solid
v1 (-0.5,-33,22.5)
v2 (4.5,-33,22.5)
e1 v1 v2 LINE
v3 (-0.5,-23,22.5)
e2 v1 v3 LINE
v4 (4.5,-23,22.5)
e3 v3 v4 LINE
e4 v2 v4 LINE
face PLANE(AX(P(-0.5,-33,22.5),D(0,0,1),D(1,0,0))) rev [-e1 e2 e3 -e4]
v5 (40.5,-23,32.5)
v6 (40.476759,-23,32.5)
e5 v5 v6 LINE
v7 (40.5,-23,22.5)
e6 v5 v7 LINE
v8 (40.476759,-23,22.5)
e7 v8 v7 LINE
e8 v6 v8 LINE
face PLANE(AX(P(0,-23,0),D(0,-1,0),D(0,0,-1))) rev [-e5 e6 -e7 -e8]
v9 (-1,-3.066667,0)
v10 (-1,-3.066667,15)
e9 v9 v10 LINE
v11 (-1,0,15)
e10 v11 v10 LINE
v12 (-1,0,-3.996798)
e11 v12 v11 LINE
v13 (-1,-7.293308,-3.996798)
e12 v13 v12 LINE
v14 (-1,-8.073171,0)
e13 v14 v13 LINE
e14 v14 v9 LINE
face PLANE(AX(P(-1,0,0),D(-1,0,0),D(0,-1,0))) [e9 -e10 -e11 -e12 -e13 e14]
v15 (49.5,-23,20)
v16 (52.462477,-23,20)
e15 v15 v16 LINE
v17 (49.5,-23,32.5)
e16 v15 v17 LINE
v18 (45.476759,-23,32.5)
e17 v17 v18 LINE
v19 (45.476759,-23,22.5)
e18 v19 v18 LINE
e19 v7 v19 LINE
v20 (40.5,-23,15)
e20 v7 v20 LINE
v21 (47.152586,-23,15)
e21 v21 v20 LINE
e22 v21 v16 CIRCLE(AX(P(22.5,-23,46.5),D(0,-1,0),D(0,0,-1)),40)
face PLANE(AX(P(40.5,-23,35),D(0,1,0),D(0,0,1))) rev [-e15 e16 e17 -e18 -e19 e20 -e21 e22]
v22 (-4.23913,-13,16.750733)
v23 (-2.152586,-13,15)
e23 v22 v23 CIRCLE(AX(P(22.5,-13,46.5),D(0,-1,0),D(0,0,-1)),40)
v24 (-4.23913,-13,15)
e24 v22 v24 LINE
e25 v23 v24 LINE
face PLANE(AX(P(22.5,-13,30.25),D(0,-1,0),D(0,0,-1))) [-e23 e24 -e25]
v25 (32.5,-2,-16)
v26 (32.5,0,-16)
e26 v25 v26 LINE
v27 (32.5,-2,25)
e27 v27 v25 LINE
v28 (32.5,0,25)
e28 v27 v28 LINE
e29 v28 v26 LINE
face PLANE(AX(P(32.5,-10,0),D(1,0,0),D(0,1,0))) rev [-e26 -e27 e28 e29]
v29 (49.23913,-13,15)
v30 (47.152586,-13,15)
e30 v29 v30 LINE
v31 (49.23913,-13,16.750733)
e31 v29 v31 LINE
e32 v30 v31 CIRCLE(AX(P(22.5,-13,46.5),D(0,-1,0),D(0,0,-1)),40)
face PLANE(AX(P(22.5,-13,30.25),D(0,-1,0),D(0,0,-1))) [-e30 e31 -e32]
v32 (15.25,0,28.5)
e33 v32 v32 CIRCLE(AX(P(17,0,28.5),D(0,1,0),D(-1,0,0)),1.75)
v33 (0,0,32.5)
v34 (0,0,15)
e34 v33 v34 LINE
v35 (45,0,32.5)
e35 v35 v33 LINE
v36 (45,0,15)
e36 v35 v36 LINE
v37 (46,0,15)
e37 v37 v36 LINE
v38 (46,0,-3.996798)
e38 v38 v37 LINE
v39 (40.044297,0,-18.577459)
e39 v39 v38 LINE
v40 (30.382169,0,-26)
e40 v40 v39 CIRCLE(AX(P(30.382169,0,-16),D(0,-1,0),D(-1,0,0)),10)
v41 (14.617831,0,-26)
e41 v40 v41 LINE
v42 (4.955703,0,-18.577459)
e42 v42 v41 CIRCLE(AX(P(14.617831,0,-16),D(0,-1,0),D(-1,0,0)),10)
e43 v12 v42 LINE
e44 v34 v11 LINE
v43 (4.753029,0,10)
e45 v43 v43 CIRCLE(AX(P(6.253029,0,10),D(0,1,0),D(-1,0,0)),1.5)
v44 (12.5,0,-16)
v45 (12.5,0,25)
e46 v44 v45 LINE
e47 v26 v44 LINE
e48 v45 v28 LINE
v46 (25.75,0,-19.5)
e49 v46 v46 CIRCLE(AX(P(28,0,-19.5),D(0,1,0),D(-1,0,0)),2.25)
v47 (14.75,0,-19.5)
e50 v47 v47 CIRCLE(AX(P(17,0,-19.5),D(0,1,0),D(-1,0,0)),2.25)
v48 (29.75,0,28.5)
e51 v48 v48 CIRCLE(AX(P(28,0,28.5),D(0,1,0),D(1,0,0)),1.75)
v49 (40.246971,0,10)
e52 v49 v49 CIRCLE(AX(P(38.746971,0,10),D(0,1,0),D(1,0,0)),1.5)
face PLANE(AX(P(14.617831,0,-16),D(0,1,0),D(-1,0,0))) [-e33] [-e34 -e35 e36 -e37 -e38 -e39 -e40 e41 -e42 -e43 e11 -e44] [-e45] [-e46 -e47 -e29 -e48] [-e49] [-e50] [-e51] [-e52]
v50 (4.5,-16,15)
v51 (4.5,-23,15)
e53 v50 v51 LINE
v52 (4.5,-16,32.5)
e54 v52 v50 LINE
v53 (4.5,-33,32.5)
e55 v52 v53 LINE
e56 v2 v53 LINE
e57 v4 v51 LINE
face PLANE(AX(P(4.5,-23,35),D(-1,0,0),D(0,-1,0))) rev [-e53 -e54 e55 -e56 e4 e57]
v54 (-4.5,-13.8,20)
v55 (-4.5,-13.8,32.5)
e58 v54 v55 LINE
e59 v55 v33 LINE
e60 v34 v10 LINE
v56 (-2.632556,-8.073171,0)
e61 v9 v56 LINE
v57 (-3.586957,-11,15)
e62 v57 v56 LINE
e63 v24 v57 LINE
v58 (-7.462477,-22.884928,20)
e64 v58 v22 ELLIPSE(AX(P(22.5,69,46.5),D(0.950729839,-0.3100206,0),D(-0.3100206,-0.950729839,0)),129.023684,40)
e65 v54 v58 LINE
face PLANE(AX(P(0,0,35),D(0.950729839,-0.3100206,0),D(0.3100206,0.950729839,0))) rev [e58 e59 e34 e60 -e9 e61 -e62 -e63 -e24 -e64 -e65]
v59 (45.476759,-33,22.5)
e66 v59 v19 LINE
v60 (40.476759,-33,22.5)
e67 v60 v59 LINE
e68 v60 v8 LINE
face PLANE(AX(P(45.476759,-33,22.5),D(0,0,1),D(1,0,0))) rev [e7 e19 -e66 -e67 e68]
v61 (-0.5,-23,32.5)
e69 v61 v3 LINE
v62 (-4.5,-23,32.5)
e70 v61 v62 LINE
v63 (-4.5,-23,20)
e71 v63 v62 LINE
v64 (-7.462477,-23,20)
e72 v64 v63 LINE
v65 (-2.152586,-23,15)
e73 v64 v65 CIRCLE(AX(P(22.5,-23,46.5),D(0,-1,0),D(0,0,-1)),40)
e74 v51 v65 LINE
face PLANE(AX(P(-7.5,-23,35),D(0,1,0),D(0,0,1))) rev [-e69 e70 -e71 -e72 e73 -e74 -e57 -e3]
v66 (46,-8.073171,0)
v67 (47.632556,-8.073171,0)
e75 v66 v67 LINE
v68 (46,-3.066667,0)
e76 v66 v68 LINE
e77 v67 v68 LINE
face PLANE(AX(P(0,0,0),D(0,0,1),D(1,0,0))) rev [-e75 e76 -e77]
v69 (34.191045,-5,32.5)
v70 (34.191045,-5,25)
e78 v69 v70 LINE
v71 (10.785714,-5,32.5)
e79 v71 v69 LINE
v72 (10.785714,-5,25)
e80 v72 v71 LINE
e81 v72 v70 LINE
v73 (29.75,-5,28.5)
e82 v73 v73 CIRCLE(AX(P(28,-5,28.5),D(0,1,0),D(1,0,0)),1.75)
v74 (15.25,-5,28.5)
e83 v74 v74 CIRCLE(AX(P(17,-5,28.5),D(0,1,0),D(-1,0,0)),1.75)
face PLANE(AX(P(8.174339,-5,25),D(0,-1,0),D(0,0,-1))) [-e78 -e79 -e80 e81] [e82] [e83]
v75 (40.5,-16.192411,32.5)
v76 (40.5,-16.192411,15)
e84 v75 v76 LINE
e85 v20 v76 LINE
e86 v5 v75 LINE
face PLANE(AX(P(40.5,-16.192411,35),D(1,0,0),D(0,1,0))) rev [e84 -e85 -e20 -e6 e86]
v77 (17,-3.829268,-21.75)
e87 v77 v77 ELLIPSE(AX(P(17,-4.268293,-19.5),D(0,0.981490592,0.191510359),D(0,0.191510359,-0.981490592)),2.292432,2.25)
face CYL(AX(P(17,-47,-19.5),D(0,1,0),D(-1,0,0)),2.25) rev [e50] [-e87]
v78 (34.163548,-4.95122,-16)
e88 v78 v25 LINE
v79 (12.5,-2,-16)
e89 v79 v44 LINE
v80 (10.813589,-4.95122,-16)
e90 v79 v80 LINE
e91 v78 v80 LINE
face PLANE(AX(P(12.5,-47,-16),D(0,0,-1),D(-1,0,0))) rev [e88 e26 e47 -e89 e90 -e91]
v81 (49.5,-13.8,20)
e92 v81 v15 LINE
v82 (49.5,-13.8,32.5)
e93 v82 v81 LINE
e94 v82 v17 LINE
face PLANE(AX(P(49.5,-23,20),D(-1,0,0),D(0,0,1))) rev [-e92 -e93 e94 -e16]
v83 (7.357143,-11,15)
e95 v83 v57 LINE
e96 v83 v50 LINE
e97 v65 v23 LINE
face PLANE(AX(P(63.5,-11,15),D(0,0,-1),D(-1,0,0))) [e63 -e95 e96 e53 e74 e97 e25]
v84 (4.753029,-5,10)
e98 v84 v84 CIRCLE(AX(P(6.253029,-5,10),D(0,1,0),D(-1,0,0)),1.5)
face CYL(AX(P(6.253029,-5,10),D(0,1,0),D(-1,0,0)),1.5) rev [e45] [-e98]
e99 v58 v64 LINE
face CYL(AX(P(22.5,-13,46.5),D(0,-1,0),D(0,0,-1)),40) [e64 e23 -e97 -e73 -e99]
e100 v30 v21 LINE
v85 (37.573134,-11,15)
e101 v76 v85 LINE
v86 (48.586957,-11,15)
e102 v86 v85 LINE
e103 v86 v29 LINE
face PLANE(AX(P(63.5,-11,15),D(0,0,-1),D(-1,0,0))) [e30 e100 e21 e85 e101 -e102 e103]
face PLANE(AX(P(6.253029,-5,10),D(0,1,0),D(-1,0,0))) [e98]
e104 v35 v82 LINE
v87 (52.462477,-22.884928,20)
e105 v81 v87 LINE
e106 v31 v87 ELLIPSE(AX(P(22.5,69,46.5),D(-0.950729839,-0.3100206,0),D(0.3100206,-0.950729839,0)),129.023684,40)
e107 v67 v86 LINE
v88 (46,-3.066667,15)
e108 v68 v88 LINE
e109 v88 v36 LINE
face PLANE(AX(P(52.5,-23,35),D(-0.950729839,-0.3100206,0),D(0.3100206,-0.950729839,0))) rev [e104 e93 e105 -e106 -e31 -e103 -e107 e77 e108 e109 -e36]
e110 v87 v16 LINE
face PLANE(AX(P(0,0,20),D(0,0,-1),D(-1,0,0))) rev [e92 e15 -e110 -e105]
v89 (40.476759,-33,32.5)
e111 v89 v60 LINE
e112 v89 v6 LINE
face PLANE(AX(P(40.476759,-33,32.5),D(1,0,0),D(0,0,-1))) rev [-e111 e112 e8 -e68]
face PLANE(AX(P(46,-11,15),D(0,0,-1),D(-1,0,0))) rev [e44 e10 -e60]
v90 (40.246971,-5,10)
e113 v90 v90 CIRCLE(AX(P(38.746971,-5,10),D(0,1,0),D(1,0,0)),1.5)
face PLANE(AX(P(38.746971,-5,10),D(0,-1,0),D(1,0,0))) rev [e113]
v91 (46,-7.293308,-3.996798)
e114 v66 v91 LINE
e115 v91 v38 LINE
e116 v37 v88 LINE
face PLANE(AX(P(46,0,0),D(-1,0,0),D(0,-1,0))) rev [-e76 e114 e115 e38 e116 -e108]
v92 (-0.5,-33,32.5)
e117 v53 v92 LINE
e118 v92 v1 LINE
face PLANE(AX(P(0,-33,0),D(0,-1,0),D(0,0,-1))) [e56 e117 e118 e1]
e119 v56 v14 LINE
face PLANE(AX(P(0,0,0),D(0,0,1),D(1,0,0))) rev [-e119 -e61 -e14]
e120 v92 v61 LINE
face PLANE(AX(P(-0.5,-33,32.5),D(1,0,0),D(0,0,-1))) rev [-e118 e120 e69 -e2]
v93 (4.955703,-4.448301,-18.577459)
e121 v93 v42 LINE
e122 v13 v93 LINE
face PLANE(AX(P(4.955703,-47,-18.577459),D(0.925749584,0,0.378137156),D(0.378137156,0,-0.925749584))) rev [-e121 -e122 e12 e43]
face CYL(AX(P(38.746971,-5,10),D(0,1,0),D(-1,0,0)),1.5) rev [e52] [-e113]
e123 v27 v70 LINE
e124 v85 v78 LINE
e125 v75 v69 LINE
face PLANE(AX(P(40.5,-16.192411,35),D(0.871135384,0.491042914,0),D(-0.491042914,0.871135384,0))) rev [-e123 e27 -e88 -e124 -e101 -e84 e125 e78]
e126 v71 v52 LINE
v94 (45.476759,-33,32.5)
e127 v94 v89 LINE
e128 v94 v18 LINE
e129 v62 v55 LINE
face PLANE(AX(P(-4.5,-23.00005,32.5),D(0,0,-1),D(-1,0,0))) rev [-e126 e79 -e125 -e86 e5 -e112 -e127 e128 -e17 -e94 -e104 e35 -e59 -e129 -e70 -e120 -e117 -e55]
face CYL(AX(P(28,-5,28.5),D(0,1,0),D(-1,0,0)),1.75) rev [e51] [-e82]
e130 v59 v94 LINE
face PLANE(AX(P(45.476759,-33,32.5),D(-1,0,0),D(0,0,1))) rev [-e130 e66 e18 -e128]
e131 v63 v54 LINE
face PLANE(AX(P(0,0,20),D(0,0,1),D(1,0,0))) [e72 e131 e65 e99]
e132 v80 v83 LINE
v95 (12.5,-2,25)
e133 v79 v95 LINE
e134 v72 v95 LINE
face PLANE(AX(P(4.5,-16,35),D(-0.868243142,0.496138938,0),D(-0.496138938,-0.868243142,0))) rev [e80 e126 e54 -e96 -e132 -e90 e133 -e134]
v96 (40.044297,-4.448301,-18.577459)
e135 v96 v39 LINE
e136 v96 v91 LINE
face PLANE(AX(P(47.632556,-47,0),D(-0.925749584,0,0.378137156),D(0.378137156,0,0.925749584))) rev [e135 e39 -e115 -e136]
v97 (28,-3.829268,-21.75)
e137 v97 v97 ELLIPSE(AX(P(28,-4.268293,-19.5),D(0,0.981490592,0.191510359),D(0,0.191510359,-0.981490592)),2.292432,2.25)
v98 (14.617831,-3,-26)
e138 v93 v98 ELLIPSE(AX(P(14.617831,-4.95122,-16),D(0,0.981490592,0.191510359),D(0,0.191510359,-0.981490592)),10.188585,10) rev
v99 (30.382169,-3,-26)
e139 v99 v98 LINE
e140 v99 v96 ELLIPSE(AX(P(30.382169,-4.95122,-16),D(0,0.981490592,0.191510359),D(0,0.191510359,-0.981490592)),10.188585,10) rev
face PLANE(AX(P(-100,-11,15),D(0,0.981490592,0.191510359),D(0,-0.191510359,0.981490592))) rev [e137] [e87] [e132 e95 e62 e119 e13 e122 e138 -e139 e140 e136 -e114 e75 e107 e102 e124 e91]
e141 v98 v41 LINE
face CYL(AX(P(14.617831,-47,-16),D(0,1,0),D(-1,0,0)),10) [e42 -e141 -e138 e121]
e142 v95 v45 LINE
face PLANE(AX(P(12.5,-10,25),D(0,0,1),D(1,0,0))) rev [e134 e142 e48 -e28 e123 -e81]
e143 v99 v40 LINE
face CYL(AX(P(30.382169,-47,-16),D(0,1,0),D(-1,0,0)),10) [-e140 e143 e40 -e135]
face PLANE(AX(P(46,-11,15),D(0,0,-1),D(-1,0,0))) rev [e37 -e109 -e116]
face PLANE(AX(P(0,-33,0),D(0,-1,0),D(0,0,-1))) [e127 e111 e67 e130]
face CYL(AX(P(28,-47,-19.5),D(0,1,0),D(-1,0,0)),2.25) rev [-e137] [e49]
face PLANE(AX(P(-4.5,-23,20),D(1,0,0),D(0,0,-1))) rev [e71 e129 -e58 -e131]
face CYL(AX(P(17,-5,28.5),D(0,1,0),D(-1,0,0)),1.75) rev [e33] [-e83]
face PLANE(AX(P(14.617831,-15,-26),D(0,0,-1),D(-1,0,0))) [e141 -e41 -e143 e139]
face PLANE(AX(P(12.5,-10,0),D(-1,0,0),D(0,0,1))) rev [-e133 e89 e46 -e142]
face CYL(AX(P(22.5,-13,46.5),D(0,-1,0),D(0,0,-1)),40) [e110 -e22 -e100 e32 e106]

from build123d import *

# Parameters (mm, degrees)
SALIENTE_EXTRUIR1_DEPTH  = 35
CROQUIS6_R               = 2.25
CROQUIS6_W               = 20
CROQUIS6_H               = 25
CORTAR_EXTRUIR3_DEPTH    = 10
CROQUIS7_R               = 2.25
SALIENTE_EXTRUIR4_DEPTH  = 15
CORTAR_EXTRUIR8_DEPTH    = 50
CORTAR_EXTRUIR11_REACH   = 69.158
CORTAR_EXTRUIR12_DEPTH   = 16
CROQUIS13_W              = 6.081292266
CROQUIS13_H              = 9.753773429
CORTAR_EXTRUIR13_DEPTH   = 15
CORTAR_EXTRUIR14_DEPTH   = 63.5
CORTAR_EXTRUIR15_DEPTH   = 100
SALIENTE_EXTRUIR5_REACH  = 69.158
CROQUIS16_W              = 15
CROQUIS16_H              = 10
CORTAR_EXTRUIR16_DEPTH   = 200
CORTAR_EXTRUIR17_DEPTH   = 200
SALIENTE_EXTRUIR7_DEPTH  = 23.5
CROQUIS22_R              = 2.25
CORTAR_EXTRUIR19_DEPTH   = 47
CORTAR_EXTRUIR20_DEPTH   = 31
CROQUIS24_W              = 29.420485752
CROQUIS24_H              = 5
SALIENTE_EXTRUIR9_DEPTH  = 10
CROQUIS25_R              = 1.75
CROQUIS25_R_2            = 1.5
CORTAR_EXTRUIR21_DEPTH   = 5
CROQUIS26_W              = 58.407198467
CROQUIS26_H              = 13.689988589
CORTAR_EXTRUIR22_DEPTH   = 73.871462178
CROQUIS27_W              = 5
CROQUIS27_H              = 10
SALIENTE_EXTRUIR10_DEPTH = 10
CORTAR_EXTRUIR23_START   = -10
CORTAR_EXTRUIR23_DEPTH   = 10


# Read off the part's stored shape, not the designer's step: Cortar-Extruir23
with BuildPart() as part:
    # Croquis1 → Saliente-Extruir1 (new body)
    with BuildSketch(Plane.XY):
        Polygon((0, 0), (45, 0), (52.5, -23), (40.5, -23), (40.5, -16.192411456), (32.5, -2), (12.5, -2), (4.5, -16), (4.5, -23), (-7.5, -23), align=None)
    extrude(amount=SALIENTE_EXTRUIR1_DEPTH)

    # Croquis6 → Cortar-Extruir3 (cut)
    with BuildSketch(Plane(origin=(0, 0, 0), x_dir=(1, 0, 0), z_dir=(0, 1, 0))):
        with Locations(Location((17, -28.5, 0), (0, 0, 180))):
            Circle(CROQUIS6_R)
        with Locations(Location((28, -28.5, 0), (0, 0, 270))):
            Circle(CROQUIS6_R)
        with Locations((22.5, -12.5)):
            Rectangle(CROQUIS6_W, CROQUIS6_H)
    extrude(amount=-CORTAR_EXTRUIR3_DEPTH, mode=Mode.SUBTRACT)

    # Cortar-Extruir11: up to this plane
    cortar_extruir11_end = Plane(origin=(50, -15, 0), z_dir=(0, -0.9079593845004518, -0.41905817746174695))
    # Croquis11 → Cortar-Extruir11 (cut, up to the surface)
    with BuildSketch(Plane.XZ.offset(23), mode=Mode.PRIVATE) as cortar_extruir11_sk1:
        with BuildLine():
            Line((-7.5, 15), (-7.5, -3.030649644))
            Line((-7.5, -3.030649644), (52.5, -3.030649644))
            Line((52.5, -3.030649644), (52.5, 15))
            ThreePointArc((52.5, 15), (22.5, 5.553378231), (-7.5, 15))
        make_face()
    cortar_extruir11_tool1 = split(extrude(cortar_extruir11_sk1.sketch, amount=-CORTAR_EXTRUIR11_REACH, mode=Mode.PRIVATE), bisect_by=cortar_extruir11_end, keep=Keep.BOTH, mode=Mode.PRIVATE)
    add(cortar_extruir11_tool1.solids().sort_by_distance((22.5, -23, 3.105508))[0], mode=Mode.SUBTRACT)

    # Croquis13 → Cortar-Extruir13 (cut)
    with BuildSketch(Plane.XY.offset(35)):
        with Locations((-7.540646133, -18.123113286)):
            Rectangle(CROQUIS13_W, CROQUIS13_H)
        with Locations((52.540646133, -18.123113286)):
            Rectangle(CROQUIS13_W, CROQUIS13_H)
    extrude(amount=-CORTAR_EXTRUIR13_DEPTH, mode=Mode.SUBTRACT)

    # Croquis14 → Cortar-Extruir14 (cut, symmetric)
    with BuildSketch(Plane(origin=(0, 0, 0), x_dir=(0, 0, -1), z_dir=(1, 0, 0))):
        Polygon((-15, -11), (-15, -28.858785619), (26, -23), (26, -3), align=None)
    extrude(amount=CORTAR_EXTRUIR14_DEPTH, both=True, mode=Mode.SUBTRACT)

    # Saliente-Extruir5: up to this face of the body (flat: up to its plane)
    saliente_extruir5_end = Plane(part.part.faces().sort_by_distance((6.25, 0, 0.570087713))[0])
    # Croquis16 → Saliente-Extruir5 (add, up to the picked face)
    with BuildSketch(Plane.XZ.offset(23), mode=Mode.PRIVATE) as saliente_extruir5_sk1:
        with Locations((5, 40)):
            Rectangle(CROQUIS16_W, CROQUIS16_H)
    saliente_extruir5_tool1 = split(extrude(saliente_extruir5_sk1.sketch, amount=-SALIENTE_EXTRUIR5_REACH, mode=Mode.PRIVATE), bisect_by=saliente_extruir5_end, keep=Keep.BOTH, mode=Mode.PRIVATE)
    # Croquis16 → Saliente-Extruir5 (add, up to the picked face)
    with BuildSketch(Plane.XZ.offset(23), mode=Mode.PRIVATE) as saliente_extruir5_sk2:
        with Locations((40, 40)):
            Rectangle(CROQUIS16_W, CROQUIS16_H)
    saliente_extruir5_tool2 = split(extrude(saliente_extruir5_sk2.sketch, amount=-SALIENTE_EXTRUIR5_REACH, mode=Mode.PRIVATE), bisect_by=saliente_extruir5_end, keep=Keep.BOTH, mode=Mode.PRIVATE)
    add(saliente_extruir5_tool1.solids().sort_by(Axis((5, -23, 40), (0, 1, 0)))[0])
    add(saliente_extruir5_tool2.solids().sort_by(Axis((40, -23, 40), (0, 1, 0)))[0])

    # Croquis17 → Cortar-Extruir16 (cut)
    with BuildSketch(Plane.ZY.offset(2.5)):
        Polygon((35, 0), (45, -23), (45, 0), align=None)
    extrude(amount=-CORTAR_EXTRUIR16_DEPTH, mode=Mode.SUBTRACT)

    # Croquis18 → Cortar-Extruir17 (cut)
    with BuildSketch(Plane(origin=(0, 0, 35), x_dir=(-1, 0, 0), z_dir=(0, 0, -1))):
        Polygon((-32.5, -2), (-40.5, -16.192411456), (-40.5, -23), (-32.5, -23), align=None)
        Polygon((-12.5, -23), (-4.5, -23), (-4.5, -16), (-12.5, -2), align=None)
        Polygon((-47.5, -7.666666667), (-45, 0), (-47.5, 0), align=None)
        Polygon((2.5, 0), (0, 0), (2.5, -7.666666667), align=None)
    extrude(amount=-CORTAR_EXTRUIR17_DEPTH, mode=Mode.SUBTRACT)



with BuildPart() as body_2:
    # Croquis7 → Saliente-Extruir4 (new body)
    with BuildSketch(Plane(origin=(0, 0, 0), x_dir=(1, 0, 0), z_dir=(0, 1, 0))):
        with BuildLine():
            Line((12.5, 16), (32.5, 16))
            Line((32.5, 16), (32.5, 0))
            Line((32.5, 0), (45, 0))
            Line((45, 0), (40.044296858, 18.577458823))
            ThreePointArc((40.044296858, 18.577458823), (36.474189304, 23.930150952), (30.382169451, 26))
            Line((30.382169451, 26), (14.617830549, 26))
            ThreePointArc((14.617830549, 26), (8.525810696, 23.930150952), (4.955703142, 18.577458823))
            Line((4.955703142, 18.577458823), (0, 0))
            Line((0, 0), (12.5, 0))
            Line((12.5, 0), (12.5, 16))
        make_face()
        with Locations((28, 19.5)):
            Circle(CROQUIS7_R, mode=Mode.SUBTRACT)
        with Locations((17, 19.5)):
            Circle(CROQUIS7_R, mode=Mode.SUBTRACT)
    extrude(amount=-SALIENTE_EXTRUIR4_DEPTH)

    # Croquis10 → Cortar-Extruir8 (cut)
    with BuildSketch(Plane(origin=(0, 0, 0), x_dir=(0, 0, -1), z_dir=(1, 0, 0))):
        Polygon((0, -15), (26, -3), (26, 0), (28.244981963, 0), (28.244981963, -21.856093693), align=None)
    extrude(amount=CORTAR_EXTRUIR8_DEPTH, mode=Mode.SUBTRACT)

    # Croquis12 → Cortar-Extruir12 (cut)
    with BuildSketch(Plane.XY):
        Polygon((12.5, -2), (12.5, -7.5), (12.5, -22.325980529), (0.885153984, -22.325980529), align=None)
        Polygon((44.114846016, -22.325980529), (32.5, -22.325980529), (32.5, -7.5), (32.5, -2), align=None)
    extrude(amount=-CORTAR_EXTRUIR12_DEPTH, mode=Mode.SUBTRACT)

    # Croquis15 → Cortar-Extruir15 (cut, symmetric)
    with BuildSketch(Plane(origin=(0, 0, 0), x_dir=(0, 0, -1), z_dir=(1, 0, 0))):
        Polygon((-15, -23), (-15, -11), (26, -3), align=None)
    extrude(amount=CORTAR_EXTRUIR15_DEPTH, both=True, mode=Mode.SUBTRACT)


with BuildPart() as part_1:
    add(part.part)

    add(body_2.part)  # Saliente-Extruir7 merges body 2
    # Croquis20 → Saliente-Extruir7 (add, symmetric)
    with BuildSketch(Plane(origin=(22.5, 0, 0), x_dir=(0, 0, -1), z_dir=(1, 0, 0))):
        Polygon((-15, -11), (-15, 0), (26, 0), (26, -3), align=None)
    extrude(amount=SALIENTE_EXTRUIR7_DEPTH, both=True)

    # Croquis22 → Cortar-Extruir19 (cut)
    with BuildSketch(Plane(origin=(0, 0, 0), x_dir=(1, 0, 0), z_dir=(0, 1, 0))):
        with Locations(Location((17, 19.5, 0), (0, 0, 180))):
            Circle(CROQUIS22_R)
        with Locations(Location((28, 19.5, 0), (0, 0, 180))):
            Circle(CROQUIS22_R)
        Polygon((12.5, 0), (12.5, -25), (32.5, -25), (32.5, 0), (32.5, 16), (12.5, 16), align=None)
        with BuildLine():
            Line((4.955703142, 18.577458823), (-2.632555673, 0))
            Line((-2.632555673, 0), (-11.688532454, 0))
            Line((-11.688532454, 0), (-11.688532454, 31.257495622))
            Line((-11.688532454, 31.257495622), (0, 31.257495622))
            Line((0, 31.257495622), (45, 31.257495622))
            Line((45, 31.257495622), (54.896993635, 31.257495622))
            Line((54.896993635, 31.257495622), (58.873924375, 0))
            Line((58.873924375, 0), (47.632555673, 0))
            Line((47.632555673, 0), (40.044296858, 18.577458823))
            ThreePointArc((40.044296858, 18.577458823), (36.474189304, 23.930150952), (30.382169451, 26))
            Line((30.382169451, 26), (14.617830549, 26))
            ThreePointArc((14.617830549, 26), (8.525810696, 23.930150952), (4.955703142, 18.577458823))
        make_face()
    extrude(amount=-CORTAR_EXTRUIR19_DEPTH, mode=Mode.SUBTRACT)

    # Croquis23 → Cortar-Extruir20 (cut)
    with BuildSketch(Plane.XY.offset(15)):
        Polygon((7.357142857, -11), (12.5, -11), (12.5, -2), align=None)
        Polygon((37.573133641, -11), (32.5, -2), (32.5, -11), align=None)
    extrude(amount=-CORTAR_EXTRUIR20_DEPTH, mode=Mode.SUBTRACT)

    # Croquis24 → Saliente-Extruir9 (add)
    with BuildSketch(Plane.XY.offset(35)):
        with Locations((22.884581513, -2.5)):
            Rectangle(CROQUIS24_W, CROQUIS24_H)
    extrude(amount=-SALIENTE_EXTRUIR9_DEPTH)

    # Croquis25 → Cortar-Extruir21 (cut)
    with BuildSketch(Plane(origin=(0, 0, 0), x_dir=(1, 0, 0), z_dir=(0, 1, 0))):
        with Locations(Location((17, -28.5, 0), (0, 0, 180))):
            Circle(CROQUIS25_R)
        with Locations((28, -28.5)):
            Circle(CROQUIS25_R)
        with Locations(Location((6.253029256, -10.000000184, 0), (0, 0, 180))):
            Circle(CROQUIS25_R_2)
        with Locations((38.746970744, -10.000000184)):
            Circle(CROQUIS25_R_2)
    extrude(amount=-CORTAR_EXTRUIR21_DEPTH, mode=Mode.SUBTRACT)

    # Croquis26 → Cortar-Extruir22 (cut, through all)
    with BuildSketch(Plane(origin=(0, 0, 0), x_dir=(1, 0, 0), z_dir=(0, 1, 0))):
        with Locations((24.703599234, -39.344994294)):
            Rectangle(CROQUIS26_W, CROQUIS26_H)
    extrude(amount=-CORTAR_EXTRUIR22_DEPTH, mode=Mode.SUBTRACT)

    # Croquis27 → Saliente-Extruir10 (add)
    with BuildSketch(Plane.XZ.offset(23)):
        with Locations((2, 27.5)):
            Rectangle(CROQUIS27_W, CROQUIS27_H)
        with Locations((42.976758833, 27.5)):
            Rectangle(CROQUIS27_W, CROQUIS27_H)
    extrude(amount=SALIENTE_EXTRUIR10_DEPTH)

    # Cortar-Extruir23 outline → Cortar-Extruir23 (cut)
    with BuildSketch(Plane.XZ.offset(23).offset(CORTAR_EXTRUIR23_START)):
        with BuildLine():
            ThreePointArc((-2.152586071, 15), (-4.921729811, 17.378723686), (-7.462476533, 20))
            Line((-7.462476533, 20), (-9, 21.738415502))
            Line((-9, 21.738415502), (-9, 15))
            Line((-9, 15), (-2.152586071, 15))
        make_face()
        with BuildLine():
            ThreePointArc((52.462476533, 20), (49.921729811, 17.378723686), (47.152586071, 15))
            Line((47.152586071, 15), (54, 15))
            Line((54, 15), (54, 21.738415502))
            Line((54, 21.738415502), (52.462476533, 20))
        make_face()
    extrude(amount=CORTAR_EXTRUIR23_DEPTH, mode=Mode.SUBTRACT)


solid = part_1.part
